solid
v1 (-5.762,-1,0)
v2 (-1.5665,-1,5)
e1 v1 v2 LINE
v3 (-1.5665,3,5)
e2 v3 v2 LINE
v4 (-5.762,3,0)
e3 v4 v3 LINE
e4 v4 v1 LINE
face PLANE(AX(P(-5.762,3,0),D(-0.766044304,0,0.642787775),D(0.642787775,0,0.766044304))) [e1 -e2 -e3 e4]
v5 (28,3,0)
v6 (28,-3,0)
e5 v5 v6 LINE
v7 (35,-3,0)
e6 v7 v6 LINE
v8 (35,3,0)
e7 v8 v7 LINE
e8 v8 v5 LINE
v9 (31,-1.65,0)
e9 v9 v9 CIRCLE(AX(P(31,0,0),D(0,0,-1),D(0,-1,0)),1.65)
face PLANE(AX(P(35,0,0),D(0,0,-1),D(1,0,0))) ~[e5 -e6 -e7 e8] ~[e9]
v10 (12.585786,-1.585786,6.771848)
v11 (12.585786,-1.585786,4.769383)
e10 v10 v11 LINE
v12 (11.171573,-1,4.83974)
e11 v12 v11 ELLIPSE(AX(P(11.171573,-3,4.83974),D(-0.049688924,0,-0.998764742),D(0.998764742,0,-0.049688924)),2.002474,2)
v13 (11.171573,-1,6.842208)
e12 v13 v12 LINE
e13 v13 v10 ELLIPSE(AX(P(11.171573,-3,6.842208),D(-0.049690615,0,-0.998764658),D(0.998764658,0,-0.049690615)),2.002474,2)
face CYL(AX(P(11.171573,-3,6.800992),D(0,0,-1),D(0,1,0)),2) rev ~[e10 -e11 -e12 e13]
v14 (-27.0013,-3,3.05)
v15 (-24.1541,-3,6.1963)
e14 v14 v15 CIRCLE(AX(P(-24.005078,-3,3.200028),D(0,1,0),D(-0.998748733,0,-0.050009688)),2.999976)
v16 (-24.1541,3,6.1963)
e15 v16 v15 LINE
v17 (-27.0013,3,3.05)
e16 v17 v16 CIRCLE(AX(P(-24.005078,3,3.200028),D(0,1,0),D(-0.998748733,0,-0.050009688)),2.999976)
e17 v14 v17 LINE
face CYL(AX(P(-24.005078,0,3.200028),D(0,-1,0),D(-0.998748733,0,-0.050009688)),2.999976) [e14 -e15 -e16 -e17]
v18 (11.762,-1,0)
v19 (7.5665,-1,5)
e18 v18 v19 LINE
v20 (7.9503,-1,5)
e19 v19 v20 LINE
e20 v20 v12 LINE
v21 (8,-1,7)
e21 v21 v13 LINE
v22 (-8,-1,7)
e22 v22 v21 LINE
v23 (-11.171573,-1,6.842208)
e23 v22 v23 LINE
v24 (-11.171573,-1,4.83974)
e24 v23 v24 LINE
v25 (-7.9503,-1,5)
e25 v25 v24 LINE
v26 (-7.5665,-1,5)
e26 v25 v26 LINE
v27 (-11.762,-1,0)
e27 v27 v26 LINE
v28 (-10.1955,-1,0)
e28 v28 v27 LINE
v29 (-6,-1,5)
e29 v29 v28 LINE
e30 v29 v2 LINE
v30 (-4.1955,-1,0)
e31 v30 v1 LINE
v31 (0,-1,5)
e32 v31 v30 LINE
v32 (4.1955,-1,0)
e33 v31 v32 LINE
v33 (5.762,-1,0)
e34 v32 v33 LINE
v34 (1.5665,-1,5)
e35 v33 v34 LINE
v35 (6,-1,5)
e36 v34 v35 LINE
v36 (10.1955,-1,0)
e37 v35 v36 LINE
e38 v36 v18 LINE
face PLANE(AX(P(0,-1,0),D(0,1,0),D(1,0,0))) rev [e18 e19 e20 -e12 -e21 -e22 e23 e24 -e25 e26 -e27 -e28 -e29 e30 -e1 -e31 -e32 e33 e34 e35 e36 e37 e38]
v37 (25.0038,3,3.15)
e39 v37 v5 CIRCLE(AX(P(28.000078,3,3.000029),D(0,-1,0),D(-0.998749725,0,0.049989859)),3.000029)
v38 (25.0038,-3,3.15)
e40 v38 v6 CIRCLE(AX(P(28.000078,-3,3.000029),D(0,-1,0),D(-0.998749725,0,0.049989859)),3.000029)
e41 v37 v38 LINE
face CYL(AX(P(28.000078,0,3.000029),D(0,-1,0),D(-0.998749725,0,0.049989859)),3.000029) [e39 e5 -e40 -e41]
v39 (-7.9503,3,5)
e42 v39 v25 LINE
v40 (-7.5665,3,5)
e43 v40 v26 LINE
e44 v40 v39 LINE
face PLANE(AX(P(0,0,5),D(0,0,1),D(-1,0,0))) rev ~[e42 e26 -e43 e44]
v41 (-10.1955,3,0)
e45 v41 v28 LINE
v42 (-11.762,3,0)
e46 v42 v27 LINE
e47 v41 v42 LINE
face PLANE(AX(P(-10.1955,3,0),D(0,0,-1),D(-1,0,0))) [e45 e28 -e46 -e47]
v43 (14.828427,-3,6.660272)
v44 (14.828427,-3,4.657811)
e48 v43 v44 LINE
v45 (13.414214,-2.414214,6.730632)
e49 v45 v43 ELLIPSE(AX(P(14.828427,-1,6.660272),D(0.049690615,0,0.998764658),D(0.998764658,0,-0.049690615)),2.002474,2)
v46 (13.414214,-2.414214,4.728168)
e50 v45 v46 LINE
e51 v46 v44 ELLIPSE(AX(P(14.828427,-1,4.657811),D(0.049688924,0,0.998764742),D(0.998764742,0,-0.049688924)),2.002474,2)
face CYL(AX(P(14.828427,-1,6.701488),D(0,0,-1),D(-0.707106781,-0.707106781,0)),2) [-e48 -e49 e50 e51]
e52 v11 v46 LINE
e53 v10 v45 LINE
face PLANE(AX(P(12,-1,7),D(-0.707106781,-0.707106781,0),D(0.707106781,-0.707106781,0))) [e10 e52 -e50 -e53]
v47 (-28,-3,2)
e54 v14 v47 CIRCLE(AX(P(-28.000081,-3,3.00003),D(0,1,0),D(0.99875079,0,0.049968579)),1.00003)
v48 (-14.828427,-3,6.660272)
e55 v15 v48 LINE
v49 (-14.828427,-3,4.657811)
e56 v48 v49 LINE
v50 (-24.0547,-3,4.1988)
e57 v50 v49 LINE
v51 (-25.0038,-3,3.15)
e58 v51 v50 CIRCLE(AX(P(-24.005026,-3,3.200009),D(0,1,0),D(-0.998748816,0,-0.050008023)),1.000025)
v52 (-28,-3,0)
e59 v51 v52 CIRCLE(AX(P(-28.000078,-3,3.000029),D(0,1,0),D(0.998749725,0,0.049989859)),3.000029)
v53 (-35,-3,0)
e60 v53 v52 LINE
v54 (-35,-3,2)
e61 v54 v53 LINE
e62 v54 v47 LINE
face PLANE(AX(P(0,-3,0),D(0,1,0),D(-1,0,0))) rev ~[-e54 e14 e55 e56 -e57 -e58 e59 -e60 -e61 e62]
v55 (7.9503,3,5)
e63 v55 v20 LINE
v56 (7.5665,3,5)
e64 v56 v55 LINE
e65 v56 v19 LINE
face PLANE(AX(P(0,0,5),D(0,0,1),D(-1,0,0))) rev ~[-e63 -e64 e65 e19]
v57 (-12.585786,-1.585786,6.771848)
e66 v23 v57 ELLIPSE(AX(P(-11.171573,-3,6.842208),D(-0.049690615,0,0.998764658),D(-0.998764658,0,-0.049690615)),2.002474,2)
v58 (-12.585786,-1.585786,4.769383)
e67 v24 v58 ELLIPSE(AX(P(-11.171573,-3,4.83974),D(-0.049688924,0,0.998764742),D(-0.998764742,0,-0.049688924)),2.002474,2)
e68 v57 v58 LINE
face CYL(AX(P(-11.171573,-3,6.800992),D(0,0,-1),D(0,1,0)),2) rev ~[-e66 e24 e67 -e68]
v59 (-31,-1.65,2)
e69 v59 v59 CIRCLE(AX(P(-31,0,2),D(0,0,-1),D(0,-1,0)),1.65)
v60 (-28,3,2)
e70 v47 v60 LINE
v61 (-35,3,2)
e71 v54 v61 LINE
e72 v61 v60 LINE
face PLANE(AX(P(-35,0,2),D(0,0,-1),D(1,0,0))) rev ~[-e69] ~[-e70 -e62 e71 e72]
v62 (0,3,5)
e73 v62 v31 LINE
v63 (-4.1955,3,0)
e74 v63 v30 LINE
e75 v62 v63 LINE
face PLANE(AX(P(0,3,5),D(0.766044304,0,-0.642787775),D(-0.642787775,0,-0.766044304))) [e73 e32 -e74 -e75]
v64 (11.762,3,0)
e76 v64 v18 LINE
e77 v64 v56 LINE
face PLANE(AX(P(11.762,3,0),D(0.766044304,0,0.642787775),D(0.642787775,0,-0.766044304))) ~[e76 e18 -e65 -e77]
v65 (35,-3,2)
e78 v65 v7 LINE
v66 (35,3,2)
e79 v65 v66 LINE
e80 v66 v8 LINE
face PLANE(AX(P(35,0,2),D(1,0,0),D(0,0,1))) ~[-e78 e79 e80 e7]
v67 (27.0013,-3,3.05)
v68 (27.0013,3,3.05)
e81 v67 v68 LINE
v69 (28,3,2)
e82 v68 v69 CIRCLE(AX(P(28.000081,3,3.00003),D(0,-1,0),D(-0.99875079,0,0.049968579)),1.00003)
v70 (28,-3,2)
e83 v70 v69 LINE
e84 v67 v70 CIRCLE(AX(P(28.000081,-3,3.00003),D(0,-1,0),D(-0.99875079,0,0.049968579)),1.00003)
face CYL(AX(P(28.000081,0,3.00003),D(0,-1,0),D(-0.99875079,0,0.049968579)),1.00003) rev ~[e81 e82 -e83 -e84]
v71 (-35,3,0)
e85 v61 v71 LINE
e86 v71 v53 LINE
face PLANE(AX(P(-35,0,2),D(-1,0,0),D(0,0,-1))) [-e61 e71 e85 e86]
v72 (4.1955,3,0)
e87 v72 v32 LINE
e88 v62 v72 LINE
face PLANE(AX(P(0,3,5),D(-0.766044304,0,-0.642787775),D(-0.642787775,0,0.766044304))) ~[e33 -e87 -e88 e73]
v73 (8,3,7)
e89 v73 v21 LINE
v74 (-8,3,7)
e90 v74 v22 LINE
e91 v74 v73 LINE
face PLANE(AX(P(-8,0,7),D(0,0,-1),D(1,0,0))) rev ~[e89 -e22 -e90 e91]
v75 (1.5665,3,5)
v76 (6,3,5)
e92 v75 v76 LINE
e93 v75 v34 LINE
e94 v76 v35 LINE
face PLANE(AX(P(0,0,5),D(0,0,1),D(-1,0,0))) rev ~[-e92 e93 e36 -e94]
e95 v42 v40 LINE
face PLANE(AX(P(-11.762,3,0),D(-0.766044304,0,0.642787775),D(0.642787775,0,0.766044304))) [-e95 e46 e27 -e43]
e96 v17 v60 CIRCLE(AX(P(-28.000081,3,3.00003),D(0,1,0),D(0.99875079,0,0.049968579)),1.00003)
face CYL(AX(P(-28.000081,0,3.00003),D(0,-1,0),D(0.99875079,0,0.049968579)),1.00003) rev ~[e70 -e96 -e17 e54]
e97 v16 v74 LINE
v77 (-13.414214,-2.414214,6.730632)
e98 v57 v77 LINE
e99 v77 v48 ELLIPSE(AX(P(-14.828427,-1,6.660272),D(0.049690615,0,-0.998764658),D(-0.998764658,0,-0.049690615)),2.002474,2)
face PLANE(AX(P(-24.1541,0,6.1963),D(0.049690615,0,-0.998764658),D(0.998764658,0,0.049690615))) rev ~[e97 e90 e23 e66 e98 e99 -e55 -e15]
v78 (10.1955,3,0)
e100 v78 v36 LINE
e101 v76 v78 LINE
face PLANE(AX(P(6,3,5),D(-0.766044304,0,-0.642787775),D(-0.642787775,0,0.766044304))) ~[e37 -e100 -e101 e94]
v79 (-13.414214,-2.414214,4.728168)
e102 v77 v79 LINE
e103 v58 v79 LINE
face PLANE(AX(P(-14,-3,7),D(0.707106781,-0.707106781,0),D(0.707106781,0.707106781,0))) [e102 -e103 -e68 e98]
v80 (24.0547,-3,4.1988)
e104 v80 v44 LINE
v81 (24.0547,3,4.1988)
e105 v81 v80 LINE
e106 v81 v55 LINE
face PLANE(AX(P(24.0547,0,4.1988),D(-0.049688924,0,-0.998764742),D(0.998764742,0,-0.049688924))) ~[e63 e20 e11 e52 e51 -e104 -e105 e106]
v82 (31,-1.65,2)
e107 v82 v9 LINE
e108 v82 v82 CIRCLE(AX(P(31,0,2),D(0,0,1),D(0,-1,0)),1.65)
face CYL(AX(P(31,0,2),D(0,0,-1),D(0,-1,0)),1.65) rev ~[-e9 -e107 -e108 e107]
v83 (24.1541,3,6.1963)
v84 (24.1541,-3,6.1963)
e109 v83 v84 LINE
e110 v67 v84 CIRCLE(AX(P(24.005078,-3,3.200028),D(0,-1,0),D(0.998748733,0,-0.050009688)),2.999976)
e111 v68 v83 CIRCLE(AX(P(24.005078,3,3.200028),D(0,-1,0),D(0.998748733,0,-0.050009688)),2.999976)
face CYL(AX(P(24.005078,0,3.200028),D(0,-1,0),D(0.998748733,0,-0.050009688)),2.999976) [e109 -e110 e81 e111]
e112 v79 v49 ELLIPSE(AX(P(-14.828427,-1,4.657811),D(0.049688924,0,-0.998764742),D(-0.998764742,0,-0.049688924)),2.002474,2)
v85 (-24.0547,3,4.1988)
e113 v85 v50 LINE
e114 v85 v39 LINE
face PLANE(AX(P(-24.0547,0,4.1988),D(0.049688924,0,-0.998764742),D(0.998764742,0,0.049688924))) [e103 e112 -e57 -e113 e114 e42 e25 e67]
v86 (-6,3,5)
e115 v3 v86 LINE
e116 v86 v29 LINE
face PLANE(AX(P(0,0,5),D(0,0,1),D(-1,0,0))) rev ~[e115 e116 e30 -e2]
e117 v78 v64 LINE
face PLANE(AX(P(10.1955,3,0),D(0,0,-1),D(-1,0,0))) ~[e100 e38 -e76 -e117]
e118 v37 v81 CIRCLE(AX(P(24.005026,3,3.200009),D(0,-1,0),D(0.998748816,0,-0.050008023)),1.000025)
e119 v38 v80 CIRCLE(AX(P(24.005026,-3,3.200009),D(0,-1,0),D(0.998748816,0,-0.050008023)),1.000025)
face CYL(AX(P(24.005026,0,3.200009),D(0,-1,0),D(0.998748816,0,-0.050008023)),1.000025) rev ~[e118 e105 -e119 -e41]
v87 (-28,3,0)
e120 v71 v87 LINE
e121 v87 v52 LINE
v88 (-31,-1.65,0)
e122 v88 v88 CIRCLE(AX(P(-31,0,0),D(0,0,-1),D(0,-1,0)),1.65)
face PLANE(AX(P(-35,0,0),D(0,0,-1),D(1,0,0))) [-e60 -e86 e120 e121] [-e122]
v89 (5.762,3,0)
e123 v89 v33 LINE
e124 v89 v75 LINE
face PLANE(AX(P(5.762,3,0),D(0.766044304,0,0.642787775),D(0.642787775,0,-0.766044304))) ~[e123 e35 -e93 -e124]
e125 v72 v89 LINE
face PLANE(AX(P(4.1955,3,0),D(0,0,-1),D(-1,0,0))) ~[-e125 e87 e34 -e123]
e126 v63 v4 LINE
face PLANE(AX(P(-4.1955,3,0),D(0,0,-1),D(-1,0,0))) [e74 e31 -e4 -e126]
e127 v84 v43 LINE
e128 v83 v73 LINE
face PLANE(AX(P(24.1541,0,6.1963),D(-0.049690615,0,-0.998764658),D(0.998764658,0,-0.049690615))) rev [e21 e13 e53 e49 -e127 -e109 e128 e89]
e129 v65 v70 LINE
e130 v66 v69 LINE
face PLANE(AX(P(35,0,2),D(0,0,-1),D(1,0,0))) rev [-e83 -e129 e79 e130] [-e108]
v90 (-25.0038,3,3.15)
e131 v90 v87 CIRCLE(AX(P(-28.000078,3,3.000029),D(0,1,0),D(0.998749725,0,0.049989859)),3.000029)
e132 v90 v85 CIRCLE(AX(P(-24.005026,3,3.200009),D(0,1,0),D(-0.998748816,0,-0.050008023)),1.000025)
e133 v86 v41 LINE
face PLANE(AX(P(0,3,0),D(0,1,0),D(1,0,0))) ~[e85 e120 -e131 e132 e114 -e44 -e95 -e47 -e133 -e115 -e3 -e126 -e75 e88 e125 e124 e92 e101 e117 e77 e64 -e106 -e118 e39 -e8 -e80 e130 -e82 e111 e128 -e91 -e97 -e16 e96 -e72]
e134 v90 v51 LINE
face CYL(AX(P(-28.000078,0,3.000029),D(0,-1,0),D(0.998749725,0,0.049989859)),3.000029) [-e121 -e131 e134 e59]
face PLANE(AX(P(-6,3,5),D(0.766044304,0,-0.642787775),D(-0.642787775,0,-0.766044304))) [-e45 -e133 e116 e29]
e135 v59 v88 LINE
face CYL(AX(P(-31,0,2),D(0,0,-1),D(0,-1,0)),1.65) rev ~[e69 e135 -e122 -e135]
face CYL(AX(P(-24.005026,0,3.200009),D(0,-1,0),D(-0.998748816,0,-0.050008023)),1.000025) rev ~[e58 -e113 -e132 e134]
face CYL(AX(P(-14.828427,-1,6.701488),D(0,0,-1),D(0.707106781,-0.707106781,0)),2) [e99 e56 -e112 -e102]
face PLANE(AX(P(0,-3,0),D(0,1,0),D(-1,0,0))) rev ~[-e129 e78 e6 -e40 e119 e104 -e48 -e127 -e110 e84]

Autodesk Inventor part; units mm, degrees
ref_plane "YZ Plane" through (0, 0, 0) normal (1, 0, 0) x (0, 1, 0)
ref_plane "XZ Plane" through (0, 0, 0) normal (0, 1, 0) x (-1, 0, 0)
ref_plane "XY Plane" through (0, 0, 0) normal (0, 0, 1) x (1, 0, 0)
sketch "Skizze1" plane through (0, 0, 0) normal (0, 1, 0) x (-1, 0, 0)
  line L0 (35, 2) -> (28, 2)
  line L1 (35, 2) -> (35, 0)
  line L2 (35, 0) -> (28, 0)
  line L3 (24.1541, 6.1963) -> (8, 7)
  line L4 (24.0547, 4.1988) -> (7.9503, 5)
  line L5 (31, 2) -> (31, 0) construction
  line L6 (8, 7) -> (0, 7)
  line L7 (0, 7) -> (0, 5)
  line L8 (0, 5) -> (7.9503, 5)
  arc A0 (27.0013, 3.05) -> (28, 2) centre (28, 3) ccw
  arc A1 (25.0038, 3.15) -> (28, 0) centre (28, 3) ccw
  arc A2 (25.0038, 3.15) -> (24.0547, 4.1988) centre (24.005, 3.2) ccw
  arc A3 (27.0013, 3.05) -> (24.1541, 6.1963) centre (24.005, 3.2) ccw
  point P0 (0, 0)
  dimension "d0" = 2
  dimension "d1" = 31
  dimension "d2" = 4
  dimension "d5" = 7
  dimension "d6" = 8
  dimension "d7" = 2
  dimension "d8" = 2
  dimension "d26" = 1
  dimension "d27" = 3
  dimension "d28" = 1
  dimension "d29" = 0.2
extrude "Extrusion1" add sketch "Skizze1" along normal mid plane 6
sketch "Skizze2" plane through (-35, 3, 2) normal (0, 0, 1) x (1, 0, 0)
  line L0 (0, 0) -> (7, 0) projected
  line L1 (0, -6) -> (0, 0) projected
  line L2 (7, -6) -> (0, -6) projected
  line L3 (7, -6) -> (7, 0) projected
  line L4 (35, -7.2) -> (35, 1.2) projected
  line L5 (-7, -3) -> (42, -3) projected
  point P0 (35, -3)
  point P1 (4, -3)
  dimension "d30" = 31
hole "Bohrung1" at (-31, 0, 2) direction (0, 0, -1) diameter 3.3 end through all
sketch "Skizze3" plane through (0, 3, 0) normal (0, 1, 0) x (1, 0, 0)
  line L0 (0, -5) -> (-7.9503, -5) projected
  line L1 (-0.0196, -5.3946) -> (-28.1986, -3.9926) projected
  line L2 (0, -5) -> (-4.1955, 0)
  line L3 (-4.1955, 0) -> (-5.762, 0)
  line L4 (-5.762, 0) -> (-1.5665, -5)
  line L5 (0, 1.4) -> (0, -8.4) construction
  point P0 (0, 0)
  point P1 (-28, 0)
  dimension "d19" = 40
  dimension "d20" = 1.2
extrude "Extrusion2" add sketch "Skizze3" against normal blind 4
pattern_linear "Rechteckige Anordnung1" count 2 spacing 6 along (-1, 0, 0) of "Extrusion2"
mirror "Spiegeln1" about plane through (0, 0, 0) normal (1, 0, 0) of "Extrusion1", "Bohrung1", "Extrusion2", "Rechteckige Anordnung1"
sketch "Skizze4" plane through (-8, -3, 7) normal (0, 0, 1) x (1, 0, 0)
  line L0 (8, 7.2) -> (8, -1.2) construction
  line L1 (0, 0) -> (16, 0) construction
  line L2 (-6, 0) -> (-4, 2)
  line L3 (-4, 2) -> (20, 2)
  line L4 (20, 2) -> (22, 0)
  line L5 (22, 0) -> (-6, 0)
  point P0 (8, 3)
  dimension "d31" = 2
  dimension "d32" = 24
  dimension "d33" = 45
extrude "Extrusion3" cut sketch "Skizze4" against normal through all
fillet "Rundung1" radius 2 4 edges at (-14, -3, 5.7002) (-12, -1, 5.7998) (12, -1, 5.7998) (14, -3, 5.7002)
properties part number "Dribbler Daempfer Oben" material "PVC, hart"
